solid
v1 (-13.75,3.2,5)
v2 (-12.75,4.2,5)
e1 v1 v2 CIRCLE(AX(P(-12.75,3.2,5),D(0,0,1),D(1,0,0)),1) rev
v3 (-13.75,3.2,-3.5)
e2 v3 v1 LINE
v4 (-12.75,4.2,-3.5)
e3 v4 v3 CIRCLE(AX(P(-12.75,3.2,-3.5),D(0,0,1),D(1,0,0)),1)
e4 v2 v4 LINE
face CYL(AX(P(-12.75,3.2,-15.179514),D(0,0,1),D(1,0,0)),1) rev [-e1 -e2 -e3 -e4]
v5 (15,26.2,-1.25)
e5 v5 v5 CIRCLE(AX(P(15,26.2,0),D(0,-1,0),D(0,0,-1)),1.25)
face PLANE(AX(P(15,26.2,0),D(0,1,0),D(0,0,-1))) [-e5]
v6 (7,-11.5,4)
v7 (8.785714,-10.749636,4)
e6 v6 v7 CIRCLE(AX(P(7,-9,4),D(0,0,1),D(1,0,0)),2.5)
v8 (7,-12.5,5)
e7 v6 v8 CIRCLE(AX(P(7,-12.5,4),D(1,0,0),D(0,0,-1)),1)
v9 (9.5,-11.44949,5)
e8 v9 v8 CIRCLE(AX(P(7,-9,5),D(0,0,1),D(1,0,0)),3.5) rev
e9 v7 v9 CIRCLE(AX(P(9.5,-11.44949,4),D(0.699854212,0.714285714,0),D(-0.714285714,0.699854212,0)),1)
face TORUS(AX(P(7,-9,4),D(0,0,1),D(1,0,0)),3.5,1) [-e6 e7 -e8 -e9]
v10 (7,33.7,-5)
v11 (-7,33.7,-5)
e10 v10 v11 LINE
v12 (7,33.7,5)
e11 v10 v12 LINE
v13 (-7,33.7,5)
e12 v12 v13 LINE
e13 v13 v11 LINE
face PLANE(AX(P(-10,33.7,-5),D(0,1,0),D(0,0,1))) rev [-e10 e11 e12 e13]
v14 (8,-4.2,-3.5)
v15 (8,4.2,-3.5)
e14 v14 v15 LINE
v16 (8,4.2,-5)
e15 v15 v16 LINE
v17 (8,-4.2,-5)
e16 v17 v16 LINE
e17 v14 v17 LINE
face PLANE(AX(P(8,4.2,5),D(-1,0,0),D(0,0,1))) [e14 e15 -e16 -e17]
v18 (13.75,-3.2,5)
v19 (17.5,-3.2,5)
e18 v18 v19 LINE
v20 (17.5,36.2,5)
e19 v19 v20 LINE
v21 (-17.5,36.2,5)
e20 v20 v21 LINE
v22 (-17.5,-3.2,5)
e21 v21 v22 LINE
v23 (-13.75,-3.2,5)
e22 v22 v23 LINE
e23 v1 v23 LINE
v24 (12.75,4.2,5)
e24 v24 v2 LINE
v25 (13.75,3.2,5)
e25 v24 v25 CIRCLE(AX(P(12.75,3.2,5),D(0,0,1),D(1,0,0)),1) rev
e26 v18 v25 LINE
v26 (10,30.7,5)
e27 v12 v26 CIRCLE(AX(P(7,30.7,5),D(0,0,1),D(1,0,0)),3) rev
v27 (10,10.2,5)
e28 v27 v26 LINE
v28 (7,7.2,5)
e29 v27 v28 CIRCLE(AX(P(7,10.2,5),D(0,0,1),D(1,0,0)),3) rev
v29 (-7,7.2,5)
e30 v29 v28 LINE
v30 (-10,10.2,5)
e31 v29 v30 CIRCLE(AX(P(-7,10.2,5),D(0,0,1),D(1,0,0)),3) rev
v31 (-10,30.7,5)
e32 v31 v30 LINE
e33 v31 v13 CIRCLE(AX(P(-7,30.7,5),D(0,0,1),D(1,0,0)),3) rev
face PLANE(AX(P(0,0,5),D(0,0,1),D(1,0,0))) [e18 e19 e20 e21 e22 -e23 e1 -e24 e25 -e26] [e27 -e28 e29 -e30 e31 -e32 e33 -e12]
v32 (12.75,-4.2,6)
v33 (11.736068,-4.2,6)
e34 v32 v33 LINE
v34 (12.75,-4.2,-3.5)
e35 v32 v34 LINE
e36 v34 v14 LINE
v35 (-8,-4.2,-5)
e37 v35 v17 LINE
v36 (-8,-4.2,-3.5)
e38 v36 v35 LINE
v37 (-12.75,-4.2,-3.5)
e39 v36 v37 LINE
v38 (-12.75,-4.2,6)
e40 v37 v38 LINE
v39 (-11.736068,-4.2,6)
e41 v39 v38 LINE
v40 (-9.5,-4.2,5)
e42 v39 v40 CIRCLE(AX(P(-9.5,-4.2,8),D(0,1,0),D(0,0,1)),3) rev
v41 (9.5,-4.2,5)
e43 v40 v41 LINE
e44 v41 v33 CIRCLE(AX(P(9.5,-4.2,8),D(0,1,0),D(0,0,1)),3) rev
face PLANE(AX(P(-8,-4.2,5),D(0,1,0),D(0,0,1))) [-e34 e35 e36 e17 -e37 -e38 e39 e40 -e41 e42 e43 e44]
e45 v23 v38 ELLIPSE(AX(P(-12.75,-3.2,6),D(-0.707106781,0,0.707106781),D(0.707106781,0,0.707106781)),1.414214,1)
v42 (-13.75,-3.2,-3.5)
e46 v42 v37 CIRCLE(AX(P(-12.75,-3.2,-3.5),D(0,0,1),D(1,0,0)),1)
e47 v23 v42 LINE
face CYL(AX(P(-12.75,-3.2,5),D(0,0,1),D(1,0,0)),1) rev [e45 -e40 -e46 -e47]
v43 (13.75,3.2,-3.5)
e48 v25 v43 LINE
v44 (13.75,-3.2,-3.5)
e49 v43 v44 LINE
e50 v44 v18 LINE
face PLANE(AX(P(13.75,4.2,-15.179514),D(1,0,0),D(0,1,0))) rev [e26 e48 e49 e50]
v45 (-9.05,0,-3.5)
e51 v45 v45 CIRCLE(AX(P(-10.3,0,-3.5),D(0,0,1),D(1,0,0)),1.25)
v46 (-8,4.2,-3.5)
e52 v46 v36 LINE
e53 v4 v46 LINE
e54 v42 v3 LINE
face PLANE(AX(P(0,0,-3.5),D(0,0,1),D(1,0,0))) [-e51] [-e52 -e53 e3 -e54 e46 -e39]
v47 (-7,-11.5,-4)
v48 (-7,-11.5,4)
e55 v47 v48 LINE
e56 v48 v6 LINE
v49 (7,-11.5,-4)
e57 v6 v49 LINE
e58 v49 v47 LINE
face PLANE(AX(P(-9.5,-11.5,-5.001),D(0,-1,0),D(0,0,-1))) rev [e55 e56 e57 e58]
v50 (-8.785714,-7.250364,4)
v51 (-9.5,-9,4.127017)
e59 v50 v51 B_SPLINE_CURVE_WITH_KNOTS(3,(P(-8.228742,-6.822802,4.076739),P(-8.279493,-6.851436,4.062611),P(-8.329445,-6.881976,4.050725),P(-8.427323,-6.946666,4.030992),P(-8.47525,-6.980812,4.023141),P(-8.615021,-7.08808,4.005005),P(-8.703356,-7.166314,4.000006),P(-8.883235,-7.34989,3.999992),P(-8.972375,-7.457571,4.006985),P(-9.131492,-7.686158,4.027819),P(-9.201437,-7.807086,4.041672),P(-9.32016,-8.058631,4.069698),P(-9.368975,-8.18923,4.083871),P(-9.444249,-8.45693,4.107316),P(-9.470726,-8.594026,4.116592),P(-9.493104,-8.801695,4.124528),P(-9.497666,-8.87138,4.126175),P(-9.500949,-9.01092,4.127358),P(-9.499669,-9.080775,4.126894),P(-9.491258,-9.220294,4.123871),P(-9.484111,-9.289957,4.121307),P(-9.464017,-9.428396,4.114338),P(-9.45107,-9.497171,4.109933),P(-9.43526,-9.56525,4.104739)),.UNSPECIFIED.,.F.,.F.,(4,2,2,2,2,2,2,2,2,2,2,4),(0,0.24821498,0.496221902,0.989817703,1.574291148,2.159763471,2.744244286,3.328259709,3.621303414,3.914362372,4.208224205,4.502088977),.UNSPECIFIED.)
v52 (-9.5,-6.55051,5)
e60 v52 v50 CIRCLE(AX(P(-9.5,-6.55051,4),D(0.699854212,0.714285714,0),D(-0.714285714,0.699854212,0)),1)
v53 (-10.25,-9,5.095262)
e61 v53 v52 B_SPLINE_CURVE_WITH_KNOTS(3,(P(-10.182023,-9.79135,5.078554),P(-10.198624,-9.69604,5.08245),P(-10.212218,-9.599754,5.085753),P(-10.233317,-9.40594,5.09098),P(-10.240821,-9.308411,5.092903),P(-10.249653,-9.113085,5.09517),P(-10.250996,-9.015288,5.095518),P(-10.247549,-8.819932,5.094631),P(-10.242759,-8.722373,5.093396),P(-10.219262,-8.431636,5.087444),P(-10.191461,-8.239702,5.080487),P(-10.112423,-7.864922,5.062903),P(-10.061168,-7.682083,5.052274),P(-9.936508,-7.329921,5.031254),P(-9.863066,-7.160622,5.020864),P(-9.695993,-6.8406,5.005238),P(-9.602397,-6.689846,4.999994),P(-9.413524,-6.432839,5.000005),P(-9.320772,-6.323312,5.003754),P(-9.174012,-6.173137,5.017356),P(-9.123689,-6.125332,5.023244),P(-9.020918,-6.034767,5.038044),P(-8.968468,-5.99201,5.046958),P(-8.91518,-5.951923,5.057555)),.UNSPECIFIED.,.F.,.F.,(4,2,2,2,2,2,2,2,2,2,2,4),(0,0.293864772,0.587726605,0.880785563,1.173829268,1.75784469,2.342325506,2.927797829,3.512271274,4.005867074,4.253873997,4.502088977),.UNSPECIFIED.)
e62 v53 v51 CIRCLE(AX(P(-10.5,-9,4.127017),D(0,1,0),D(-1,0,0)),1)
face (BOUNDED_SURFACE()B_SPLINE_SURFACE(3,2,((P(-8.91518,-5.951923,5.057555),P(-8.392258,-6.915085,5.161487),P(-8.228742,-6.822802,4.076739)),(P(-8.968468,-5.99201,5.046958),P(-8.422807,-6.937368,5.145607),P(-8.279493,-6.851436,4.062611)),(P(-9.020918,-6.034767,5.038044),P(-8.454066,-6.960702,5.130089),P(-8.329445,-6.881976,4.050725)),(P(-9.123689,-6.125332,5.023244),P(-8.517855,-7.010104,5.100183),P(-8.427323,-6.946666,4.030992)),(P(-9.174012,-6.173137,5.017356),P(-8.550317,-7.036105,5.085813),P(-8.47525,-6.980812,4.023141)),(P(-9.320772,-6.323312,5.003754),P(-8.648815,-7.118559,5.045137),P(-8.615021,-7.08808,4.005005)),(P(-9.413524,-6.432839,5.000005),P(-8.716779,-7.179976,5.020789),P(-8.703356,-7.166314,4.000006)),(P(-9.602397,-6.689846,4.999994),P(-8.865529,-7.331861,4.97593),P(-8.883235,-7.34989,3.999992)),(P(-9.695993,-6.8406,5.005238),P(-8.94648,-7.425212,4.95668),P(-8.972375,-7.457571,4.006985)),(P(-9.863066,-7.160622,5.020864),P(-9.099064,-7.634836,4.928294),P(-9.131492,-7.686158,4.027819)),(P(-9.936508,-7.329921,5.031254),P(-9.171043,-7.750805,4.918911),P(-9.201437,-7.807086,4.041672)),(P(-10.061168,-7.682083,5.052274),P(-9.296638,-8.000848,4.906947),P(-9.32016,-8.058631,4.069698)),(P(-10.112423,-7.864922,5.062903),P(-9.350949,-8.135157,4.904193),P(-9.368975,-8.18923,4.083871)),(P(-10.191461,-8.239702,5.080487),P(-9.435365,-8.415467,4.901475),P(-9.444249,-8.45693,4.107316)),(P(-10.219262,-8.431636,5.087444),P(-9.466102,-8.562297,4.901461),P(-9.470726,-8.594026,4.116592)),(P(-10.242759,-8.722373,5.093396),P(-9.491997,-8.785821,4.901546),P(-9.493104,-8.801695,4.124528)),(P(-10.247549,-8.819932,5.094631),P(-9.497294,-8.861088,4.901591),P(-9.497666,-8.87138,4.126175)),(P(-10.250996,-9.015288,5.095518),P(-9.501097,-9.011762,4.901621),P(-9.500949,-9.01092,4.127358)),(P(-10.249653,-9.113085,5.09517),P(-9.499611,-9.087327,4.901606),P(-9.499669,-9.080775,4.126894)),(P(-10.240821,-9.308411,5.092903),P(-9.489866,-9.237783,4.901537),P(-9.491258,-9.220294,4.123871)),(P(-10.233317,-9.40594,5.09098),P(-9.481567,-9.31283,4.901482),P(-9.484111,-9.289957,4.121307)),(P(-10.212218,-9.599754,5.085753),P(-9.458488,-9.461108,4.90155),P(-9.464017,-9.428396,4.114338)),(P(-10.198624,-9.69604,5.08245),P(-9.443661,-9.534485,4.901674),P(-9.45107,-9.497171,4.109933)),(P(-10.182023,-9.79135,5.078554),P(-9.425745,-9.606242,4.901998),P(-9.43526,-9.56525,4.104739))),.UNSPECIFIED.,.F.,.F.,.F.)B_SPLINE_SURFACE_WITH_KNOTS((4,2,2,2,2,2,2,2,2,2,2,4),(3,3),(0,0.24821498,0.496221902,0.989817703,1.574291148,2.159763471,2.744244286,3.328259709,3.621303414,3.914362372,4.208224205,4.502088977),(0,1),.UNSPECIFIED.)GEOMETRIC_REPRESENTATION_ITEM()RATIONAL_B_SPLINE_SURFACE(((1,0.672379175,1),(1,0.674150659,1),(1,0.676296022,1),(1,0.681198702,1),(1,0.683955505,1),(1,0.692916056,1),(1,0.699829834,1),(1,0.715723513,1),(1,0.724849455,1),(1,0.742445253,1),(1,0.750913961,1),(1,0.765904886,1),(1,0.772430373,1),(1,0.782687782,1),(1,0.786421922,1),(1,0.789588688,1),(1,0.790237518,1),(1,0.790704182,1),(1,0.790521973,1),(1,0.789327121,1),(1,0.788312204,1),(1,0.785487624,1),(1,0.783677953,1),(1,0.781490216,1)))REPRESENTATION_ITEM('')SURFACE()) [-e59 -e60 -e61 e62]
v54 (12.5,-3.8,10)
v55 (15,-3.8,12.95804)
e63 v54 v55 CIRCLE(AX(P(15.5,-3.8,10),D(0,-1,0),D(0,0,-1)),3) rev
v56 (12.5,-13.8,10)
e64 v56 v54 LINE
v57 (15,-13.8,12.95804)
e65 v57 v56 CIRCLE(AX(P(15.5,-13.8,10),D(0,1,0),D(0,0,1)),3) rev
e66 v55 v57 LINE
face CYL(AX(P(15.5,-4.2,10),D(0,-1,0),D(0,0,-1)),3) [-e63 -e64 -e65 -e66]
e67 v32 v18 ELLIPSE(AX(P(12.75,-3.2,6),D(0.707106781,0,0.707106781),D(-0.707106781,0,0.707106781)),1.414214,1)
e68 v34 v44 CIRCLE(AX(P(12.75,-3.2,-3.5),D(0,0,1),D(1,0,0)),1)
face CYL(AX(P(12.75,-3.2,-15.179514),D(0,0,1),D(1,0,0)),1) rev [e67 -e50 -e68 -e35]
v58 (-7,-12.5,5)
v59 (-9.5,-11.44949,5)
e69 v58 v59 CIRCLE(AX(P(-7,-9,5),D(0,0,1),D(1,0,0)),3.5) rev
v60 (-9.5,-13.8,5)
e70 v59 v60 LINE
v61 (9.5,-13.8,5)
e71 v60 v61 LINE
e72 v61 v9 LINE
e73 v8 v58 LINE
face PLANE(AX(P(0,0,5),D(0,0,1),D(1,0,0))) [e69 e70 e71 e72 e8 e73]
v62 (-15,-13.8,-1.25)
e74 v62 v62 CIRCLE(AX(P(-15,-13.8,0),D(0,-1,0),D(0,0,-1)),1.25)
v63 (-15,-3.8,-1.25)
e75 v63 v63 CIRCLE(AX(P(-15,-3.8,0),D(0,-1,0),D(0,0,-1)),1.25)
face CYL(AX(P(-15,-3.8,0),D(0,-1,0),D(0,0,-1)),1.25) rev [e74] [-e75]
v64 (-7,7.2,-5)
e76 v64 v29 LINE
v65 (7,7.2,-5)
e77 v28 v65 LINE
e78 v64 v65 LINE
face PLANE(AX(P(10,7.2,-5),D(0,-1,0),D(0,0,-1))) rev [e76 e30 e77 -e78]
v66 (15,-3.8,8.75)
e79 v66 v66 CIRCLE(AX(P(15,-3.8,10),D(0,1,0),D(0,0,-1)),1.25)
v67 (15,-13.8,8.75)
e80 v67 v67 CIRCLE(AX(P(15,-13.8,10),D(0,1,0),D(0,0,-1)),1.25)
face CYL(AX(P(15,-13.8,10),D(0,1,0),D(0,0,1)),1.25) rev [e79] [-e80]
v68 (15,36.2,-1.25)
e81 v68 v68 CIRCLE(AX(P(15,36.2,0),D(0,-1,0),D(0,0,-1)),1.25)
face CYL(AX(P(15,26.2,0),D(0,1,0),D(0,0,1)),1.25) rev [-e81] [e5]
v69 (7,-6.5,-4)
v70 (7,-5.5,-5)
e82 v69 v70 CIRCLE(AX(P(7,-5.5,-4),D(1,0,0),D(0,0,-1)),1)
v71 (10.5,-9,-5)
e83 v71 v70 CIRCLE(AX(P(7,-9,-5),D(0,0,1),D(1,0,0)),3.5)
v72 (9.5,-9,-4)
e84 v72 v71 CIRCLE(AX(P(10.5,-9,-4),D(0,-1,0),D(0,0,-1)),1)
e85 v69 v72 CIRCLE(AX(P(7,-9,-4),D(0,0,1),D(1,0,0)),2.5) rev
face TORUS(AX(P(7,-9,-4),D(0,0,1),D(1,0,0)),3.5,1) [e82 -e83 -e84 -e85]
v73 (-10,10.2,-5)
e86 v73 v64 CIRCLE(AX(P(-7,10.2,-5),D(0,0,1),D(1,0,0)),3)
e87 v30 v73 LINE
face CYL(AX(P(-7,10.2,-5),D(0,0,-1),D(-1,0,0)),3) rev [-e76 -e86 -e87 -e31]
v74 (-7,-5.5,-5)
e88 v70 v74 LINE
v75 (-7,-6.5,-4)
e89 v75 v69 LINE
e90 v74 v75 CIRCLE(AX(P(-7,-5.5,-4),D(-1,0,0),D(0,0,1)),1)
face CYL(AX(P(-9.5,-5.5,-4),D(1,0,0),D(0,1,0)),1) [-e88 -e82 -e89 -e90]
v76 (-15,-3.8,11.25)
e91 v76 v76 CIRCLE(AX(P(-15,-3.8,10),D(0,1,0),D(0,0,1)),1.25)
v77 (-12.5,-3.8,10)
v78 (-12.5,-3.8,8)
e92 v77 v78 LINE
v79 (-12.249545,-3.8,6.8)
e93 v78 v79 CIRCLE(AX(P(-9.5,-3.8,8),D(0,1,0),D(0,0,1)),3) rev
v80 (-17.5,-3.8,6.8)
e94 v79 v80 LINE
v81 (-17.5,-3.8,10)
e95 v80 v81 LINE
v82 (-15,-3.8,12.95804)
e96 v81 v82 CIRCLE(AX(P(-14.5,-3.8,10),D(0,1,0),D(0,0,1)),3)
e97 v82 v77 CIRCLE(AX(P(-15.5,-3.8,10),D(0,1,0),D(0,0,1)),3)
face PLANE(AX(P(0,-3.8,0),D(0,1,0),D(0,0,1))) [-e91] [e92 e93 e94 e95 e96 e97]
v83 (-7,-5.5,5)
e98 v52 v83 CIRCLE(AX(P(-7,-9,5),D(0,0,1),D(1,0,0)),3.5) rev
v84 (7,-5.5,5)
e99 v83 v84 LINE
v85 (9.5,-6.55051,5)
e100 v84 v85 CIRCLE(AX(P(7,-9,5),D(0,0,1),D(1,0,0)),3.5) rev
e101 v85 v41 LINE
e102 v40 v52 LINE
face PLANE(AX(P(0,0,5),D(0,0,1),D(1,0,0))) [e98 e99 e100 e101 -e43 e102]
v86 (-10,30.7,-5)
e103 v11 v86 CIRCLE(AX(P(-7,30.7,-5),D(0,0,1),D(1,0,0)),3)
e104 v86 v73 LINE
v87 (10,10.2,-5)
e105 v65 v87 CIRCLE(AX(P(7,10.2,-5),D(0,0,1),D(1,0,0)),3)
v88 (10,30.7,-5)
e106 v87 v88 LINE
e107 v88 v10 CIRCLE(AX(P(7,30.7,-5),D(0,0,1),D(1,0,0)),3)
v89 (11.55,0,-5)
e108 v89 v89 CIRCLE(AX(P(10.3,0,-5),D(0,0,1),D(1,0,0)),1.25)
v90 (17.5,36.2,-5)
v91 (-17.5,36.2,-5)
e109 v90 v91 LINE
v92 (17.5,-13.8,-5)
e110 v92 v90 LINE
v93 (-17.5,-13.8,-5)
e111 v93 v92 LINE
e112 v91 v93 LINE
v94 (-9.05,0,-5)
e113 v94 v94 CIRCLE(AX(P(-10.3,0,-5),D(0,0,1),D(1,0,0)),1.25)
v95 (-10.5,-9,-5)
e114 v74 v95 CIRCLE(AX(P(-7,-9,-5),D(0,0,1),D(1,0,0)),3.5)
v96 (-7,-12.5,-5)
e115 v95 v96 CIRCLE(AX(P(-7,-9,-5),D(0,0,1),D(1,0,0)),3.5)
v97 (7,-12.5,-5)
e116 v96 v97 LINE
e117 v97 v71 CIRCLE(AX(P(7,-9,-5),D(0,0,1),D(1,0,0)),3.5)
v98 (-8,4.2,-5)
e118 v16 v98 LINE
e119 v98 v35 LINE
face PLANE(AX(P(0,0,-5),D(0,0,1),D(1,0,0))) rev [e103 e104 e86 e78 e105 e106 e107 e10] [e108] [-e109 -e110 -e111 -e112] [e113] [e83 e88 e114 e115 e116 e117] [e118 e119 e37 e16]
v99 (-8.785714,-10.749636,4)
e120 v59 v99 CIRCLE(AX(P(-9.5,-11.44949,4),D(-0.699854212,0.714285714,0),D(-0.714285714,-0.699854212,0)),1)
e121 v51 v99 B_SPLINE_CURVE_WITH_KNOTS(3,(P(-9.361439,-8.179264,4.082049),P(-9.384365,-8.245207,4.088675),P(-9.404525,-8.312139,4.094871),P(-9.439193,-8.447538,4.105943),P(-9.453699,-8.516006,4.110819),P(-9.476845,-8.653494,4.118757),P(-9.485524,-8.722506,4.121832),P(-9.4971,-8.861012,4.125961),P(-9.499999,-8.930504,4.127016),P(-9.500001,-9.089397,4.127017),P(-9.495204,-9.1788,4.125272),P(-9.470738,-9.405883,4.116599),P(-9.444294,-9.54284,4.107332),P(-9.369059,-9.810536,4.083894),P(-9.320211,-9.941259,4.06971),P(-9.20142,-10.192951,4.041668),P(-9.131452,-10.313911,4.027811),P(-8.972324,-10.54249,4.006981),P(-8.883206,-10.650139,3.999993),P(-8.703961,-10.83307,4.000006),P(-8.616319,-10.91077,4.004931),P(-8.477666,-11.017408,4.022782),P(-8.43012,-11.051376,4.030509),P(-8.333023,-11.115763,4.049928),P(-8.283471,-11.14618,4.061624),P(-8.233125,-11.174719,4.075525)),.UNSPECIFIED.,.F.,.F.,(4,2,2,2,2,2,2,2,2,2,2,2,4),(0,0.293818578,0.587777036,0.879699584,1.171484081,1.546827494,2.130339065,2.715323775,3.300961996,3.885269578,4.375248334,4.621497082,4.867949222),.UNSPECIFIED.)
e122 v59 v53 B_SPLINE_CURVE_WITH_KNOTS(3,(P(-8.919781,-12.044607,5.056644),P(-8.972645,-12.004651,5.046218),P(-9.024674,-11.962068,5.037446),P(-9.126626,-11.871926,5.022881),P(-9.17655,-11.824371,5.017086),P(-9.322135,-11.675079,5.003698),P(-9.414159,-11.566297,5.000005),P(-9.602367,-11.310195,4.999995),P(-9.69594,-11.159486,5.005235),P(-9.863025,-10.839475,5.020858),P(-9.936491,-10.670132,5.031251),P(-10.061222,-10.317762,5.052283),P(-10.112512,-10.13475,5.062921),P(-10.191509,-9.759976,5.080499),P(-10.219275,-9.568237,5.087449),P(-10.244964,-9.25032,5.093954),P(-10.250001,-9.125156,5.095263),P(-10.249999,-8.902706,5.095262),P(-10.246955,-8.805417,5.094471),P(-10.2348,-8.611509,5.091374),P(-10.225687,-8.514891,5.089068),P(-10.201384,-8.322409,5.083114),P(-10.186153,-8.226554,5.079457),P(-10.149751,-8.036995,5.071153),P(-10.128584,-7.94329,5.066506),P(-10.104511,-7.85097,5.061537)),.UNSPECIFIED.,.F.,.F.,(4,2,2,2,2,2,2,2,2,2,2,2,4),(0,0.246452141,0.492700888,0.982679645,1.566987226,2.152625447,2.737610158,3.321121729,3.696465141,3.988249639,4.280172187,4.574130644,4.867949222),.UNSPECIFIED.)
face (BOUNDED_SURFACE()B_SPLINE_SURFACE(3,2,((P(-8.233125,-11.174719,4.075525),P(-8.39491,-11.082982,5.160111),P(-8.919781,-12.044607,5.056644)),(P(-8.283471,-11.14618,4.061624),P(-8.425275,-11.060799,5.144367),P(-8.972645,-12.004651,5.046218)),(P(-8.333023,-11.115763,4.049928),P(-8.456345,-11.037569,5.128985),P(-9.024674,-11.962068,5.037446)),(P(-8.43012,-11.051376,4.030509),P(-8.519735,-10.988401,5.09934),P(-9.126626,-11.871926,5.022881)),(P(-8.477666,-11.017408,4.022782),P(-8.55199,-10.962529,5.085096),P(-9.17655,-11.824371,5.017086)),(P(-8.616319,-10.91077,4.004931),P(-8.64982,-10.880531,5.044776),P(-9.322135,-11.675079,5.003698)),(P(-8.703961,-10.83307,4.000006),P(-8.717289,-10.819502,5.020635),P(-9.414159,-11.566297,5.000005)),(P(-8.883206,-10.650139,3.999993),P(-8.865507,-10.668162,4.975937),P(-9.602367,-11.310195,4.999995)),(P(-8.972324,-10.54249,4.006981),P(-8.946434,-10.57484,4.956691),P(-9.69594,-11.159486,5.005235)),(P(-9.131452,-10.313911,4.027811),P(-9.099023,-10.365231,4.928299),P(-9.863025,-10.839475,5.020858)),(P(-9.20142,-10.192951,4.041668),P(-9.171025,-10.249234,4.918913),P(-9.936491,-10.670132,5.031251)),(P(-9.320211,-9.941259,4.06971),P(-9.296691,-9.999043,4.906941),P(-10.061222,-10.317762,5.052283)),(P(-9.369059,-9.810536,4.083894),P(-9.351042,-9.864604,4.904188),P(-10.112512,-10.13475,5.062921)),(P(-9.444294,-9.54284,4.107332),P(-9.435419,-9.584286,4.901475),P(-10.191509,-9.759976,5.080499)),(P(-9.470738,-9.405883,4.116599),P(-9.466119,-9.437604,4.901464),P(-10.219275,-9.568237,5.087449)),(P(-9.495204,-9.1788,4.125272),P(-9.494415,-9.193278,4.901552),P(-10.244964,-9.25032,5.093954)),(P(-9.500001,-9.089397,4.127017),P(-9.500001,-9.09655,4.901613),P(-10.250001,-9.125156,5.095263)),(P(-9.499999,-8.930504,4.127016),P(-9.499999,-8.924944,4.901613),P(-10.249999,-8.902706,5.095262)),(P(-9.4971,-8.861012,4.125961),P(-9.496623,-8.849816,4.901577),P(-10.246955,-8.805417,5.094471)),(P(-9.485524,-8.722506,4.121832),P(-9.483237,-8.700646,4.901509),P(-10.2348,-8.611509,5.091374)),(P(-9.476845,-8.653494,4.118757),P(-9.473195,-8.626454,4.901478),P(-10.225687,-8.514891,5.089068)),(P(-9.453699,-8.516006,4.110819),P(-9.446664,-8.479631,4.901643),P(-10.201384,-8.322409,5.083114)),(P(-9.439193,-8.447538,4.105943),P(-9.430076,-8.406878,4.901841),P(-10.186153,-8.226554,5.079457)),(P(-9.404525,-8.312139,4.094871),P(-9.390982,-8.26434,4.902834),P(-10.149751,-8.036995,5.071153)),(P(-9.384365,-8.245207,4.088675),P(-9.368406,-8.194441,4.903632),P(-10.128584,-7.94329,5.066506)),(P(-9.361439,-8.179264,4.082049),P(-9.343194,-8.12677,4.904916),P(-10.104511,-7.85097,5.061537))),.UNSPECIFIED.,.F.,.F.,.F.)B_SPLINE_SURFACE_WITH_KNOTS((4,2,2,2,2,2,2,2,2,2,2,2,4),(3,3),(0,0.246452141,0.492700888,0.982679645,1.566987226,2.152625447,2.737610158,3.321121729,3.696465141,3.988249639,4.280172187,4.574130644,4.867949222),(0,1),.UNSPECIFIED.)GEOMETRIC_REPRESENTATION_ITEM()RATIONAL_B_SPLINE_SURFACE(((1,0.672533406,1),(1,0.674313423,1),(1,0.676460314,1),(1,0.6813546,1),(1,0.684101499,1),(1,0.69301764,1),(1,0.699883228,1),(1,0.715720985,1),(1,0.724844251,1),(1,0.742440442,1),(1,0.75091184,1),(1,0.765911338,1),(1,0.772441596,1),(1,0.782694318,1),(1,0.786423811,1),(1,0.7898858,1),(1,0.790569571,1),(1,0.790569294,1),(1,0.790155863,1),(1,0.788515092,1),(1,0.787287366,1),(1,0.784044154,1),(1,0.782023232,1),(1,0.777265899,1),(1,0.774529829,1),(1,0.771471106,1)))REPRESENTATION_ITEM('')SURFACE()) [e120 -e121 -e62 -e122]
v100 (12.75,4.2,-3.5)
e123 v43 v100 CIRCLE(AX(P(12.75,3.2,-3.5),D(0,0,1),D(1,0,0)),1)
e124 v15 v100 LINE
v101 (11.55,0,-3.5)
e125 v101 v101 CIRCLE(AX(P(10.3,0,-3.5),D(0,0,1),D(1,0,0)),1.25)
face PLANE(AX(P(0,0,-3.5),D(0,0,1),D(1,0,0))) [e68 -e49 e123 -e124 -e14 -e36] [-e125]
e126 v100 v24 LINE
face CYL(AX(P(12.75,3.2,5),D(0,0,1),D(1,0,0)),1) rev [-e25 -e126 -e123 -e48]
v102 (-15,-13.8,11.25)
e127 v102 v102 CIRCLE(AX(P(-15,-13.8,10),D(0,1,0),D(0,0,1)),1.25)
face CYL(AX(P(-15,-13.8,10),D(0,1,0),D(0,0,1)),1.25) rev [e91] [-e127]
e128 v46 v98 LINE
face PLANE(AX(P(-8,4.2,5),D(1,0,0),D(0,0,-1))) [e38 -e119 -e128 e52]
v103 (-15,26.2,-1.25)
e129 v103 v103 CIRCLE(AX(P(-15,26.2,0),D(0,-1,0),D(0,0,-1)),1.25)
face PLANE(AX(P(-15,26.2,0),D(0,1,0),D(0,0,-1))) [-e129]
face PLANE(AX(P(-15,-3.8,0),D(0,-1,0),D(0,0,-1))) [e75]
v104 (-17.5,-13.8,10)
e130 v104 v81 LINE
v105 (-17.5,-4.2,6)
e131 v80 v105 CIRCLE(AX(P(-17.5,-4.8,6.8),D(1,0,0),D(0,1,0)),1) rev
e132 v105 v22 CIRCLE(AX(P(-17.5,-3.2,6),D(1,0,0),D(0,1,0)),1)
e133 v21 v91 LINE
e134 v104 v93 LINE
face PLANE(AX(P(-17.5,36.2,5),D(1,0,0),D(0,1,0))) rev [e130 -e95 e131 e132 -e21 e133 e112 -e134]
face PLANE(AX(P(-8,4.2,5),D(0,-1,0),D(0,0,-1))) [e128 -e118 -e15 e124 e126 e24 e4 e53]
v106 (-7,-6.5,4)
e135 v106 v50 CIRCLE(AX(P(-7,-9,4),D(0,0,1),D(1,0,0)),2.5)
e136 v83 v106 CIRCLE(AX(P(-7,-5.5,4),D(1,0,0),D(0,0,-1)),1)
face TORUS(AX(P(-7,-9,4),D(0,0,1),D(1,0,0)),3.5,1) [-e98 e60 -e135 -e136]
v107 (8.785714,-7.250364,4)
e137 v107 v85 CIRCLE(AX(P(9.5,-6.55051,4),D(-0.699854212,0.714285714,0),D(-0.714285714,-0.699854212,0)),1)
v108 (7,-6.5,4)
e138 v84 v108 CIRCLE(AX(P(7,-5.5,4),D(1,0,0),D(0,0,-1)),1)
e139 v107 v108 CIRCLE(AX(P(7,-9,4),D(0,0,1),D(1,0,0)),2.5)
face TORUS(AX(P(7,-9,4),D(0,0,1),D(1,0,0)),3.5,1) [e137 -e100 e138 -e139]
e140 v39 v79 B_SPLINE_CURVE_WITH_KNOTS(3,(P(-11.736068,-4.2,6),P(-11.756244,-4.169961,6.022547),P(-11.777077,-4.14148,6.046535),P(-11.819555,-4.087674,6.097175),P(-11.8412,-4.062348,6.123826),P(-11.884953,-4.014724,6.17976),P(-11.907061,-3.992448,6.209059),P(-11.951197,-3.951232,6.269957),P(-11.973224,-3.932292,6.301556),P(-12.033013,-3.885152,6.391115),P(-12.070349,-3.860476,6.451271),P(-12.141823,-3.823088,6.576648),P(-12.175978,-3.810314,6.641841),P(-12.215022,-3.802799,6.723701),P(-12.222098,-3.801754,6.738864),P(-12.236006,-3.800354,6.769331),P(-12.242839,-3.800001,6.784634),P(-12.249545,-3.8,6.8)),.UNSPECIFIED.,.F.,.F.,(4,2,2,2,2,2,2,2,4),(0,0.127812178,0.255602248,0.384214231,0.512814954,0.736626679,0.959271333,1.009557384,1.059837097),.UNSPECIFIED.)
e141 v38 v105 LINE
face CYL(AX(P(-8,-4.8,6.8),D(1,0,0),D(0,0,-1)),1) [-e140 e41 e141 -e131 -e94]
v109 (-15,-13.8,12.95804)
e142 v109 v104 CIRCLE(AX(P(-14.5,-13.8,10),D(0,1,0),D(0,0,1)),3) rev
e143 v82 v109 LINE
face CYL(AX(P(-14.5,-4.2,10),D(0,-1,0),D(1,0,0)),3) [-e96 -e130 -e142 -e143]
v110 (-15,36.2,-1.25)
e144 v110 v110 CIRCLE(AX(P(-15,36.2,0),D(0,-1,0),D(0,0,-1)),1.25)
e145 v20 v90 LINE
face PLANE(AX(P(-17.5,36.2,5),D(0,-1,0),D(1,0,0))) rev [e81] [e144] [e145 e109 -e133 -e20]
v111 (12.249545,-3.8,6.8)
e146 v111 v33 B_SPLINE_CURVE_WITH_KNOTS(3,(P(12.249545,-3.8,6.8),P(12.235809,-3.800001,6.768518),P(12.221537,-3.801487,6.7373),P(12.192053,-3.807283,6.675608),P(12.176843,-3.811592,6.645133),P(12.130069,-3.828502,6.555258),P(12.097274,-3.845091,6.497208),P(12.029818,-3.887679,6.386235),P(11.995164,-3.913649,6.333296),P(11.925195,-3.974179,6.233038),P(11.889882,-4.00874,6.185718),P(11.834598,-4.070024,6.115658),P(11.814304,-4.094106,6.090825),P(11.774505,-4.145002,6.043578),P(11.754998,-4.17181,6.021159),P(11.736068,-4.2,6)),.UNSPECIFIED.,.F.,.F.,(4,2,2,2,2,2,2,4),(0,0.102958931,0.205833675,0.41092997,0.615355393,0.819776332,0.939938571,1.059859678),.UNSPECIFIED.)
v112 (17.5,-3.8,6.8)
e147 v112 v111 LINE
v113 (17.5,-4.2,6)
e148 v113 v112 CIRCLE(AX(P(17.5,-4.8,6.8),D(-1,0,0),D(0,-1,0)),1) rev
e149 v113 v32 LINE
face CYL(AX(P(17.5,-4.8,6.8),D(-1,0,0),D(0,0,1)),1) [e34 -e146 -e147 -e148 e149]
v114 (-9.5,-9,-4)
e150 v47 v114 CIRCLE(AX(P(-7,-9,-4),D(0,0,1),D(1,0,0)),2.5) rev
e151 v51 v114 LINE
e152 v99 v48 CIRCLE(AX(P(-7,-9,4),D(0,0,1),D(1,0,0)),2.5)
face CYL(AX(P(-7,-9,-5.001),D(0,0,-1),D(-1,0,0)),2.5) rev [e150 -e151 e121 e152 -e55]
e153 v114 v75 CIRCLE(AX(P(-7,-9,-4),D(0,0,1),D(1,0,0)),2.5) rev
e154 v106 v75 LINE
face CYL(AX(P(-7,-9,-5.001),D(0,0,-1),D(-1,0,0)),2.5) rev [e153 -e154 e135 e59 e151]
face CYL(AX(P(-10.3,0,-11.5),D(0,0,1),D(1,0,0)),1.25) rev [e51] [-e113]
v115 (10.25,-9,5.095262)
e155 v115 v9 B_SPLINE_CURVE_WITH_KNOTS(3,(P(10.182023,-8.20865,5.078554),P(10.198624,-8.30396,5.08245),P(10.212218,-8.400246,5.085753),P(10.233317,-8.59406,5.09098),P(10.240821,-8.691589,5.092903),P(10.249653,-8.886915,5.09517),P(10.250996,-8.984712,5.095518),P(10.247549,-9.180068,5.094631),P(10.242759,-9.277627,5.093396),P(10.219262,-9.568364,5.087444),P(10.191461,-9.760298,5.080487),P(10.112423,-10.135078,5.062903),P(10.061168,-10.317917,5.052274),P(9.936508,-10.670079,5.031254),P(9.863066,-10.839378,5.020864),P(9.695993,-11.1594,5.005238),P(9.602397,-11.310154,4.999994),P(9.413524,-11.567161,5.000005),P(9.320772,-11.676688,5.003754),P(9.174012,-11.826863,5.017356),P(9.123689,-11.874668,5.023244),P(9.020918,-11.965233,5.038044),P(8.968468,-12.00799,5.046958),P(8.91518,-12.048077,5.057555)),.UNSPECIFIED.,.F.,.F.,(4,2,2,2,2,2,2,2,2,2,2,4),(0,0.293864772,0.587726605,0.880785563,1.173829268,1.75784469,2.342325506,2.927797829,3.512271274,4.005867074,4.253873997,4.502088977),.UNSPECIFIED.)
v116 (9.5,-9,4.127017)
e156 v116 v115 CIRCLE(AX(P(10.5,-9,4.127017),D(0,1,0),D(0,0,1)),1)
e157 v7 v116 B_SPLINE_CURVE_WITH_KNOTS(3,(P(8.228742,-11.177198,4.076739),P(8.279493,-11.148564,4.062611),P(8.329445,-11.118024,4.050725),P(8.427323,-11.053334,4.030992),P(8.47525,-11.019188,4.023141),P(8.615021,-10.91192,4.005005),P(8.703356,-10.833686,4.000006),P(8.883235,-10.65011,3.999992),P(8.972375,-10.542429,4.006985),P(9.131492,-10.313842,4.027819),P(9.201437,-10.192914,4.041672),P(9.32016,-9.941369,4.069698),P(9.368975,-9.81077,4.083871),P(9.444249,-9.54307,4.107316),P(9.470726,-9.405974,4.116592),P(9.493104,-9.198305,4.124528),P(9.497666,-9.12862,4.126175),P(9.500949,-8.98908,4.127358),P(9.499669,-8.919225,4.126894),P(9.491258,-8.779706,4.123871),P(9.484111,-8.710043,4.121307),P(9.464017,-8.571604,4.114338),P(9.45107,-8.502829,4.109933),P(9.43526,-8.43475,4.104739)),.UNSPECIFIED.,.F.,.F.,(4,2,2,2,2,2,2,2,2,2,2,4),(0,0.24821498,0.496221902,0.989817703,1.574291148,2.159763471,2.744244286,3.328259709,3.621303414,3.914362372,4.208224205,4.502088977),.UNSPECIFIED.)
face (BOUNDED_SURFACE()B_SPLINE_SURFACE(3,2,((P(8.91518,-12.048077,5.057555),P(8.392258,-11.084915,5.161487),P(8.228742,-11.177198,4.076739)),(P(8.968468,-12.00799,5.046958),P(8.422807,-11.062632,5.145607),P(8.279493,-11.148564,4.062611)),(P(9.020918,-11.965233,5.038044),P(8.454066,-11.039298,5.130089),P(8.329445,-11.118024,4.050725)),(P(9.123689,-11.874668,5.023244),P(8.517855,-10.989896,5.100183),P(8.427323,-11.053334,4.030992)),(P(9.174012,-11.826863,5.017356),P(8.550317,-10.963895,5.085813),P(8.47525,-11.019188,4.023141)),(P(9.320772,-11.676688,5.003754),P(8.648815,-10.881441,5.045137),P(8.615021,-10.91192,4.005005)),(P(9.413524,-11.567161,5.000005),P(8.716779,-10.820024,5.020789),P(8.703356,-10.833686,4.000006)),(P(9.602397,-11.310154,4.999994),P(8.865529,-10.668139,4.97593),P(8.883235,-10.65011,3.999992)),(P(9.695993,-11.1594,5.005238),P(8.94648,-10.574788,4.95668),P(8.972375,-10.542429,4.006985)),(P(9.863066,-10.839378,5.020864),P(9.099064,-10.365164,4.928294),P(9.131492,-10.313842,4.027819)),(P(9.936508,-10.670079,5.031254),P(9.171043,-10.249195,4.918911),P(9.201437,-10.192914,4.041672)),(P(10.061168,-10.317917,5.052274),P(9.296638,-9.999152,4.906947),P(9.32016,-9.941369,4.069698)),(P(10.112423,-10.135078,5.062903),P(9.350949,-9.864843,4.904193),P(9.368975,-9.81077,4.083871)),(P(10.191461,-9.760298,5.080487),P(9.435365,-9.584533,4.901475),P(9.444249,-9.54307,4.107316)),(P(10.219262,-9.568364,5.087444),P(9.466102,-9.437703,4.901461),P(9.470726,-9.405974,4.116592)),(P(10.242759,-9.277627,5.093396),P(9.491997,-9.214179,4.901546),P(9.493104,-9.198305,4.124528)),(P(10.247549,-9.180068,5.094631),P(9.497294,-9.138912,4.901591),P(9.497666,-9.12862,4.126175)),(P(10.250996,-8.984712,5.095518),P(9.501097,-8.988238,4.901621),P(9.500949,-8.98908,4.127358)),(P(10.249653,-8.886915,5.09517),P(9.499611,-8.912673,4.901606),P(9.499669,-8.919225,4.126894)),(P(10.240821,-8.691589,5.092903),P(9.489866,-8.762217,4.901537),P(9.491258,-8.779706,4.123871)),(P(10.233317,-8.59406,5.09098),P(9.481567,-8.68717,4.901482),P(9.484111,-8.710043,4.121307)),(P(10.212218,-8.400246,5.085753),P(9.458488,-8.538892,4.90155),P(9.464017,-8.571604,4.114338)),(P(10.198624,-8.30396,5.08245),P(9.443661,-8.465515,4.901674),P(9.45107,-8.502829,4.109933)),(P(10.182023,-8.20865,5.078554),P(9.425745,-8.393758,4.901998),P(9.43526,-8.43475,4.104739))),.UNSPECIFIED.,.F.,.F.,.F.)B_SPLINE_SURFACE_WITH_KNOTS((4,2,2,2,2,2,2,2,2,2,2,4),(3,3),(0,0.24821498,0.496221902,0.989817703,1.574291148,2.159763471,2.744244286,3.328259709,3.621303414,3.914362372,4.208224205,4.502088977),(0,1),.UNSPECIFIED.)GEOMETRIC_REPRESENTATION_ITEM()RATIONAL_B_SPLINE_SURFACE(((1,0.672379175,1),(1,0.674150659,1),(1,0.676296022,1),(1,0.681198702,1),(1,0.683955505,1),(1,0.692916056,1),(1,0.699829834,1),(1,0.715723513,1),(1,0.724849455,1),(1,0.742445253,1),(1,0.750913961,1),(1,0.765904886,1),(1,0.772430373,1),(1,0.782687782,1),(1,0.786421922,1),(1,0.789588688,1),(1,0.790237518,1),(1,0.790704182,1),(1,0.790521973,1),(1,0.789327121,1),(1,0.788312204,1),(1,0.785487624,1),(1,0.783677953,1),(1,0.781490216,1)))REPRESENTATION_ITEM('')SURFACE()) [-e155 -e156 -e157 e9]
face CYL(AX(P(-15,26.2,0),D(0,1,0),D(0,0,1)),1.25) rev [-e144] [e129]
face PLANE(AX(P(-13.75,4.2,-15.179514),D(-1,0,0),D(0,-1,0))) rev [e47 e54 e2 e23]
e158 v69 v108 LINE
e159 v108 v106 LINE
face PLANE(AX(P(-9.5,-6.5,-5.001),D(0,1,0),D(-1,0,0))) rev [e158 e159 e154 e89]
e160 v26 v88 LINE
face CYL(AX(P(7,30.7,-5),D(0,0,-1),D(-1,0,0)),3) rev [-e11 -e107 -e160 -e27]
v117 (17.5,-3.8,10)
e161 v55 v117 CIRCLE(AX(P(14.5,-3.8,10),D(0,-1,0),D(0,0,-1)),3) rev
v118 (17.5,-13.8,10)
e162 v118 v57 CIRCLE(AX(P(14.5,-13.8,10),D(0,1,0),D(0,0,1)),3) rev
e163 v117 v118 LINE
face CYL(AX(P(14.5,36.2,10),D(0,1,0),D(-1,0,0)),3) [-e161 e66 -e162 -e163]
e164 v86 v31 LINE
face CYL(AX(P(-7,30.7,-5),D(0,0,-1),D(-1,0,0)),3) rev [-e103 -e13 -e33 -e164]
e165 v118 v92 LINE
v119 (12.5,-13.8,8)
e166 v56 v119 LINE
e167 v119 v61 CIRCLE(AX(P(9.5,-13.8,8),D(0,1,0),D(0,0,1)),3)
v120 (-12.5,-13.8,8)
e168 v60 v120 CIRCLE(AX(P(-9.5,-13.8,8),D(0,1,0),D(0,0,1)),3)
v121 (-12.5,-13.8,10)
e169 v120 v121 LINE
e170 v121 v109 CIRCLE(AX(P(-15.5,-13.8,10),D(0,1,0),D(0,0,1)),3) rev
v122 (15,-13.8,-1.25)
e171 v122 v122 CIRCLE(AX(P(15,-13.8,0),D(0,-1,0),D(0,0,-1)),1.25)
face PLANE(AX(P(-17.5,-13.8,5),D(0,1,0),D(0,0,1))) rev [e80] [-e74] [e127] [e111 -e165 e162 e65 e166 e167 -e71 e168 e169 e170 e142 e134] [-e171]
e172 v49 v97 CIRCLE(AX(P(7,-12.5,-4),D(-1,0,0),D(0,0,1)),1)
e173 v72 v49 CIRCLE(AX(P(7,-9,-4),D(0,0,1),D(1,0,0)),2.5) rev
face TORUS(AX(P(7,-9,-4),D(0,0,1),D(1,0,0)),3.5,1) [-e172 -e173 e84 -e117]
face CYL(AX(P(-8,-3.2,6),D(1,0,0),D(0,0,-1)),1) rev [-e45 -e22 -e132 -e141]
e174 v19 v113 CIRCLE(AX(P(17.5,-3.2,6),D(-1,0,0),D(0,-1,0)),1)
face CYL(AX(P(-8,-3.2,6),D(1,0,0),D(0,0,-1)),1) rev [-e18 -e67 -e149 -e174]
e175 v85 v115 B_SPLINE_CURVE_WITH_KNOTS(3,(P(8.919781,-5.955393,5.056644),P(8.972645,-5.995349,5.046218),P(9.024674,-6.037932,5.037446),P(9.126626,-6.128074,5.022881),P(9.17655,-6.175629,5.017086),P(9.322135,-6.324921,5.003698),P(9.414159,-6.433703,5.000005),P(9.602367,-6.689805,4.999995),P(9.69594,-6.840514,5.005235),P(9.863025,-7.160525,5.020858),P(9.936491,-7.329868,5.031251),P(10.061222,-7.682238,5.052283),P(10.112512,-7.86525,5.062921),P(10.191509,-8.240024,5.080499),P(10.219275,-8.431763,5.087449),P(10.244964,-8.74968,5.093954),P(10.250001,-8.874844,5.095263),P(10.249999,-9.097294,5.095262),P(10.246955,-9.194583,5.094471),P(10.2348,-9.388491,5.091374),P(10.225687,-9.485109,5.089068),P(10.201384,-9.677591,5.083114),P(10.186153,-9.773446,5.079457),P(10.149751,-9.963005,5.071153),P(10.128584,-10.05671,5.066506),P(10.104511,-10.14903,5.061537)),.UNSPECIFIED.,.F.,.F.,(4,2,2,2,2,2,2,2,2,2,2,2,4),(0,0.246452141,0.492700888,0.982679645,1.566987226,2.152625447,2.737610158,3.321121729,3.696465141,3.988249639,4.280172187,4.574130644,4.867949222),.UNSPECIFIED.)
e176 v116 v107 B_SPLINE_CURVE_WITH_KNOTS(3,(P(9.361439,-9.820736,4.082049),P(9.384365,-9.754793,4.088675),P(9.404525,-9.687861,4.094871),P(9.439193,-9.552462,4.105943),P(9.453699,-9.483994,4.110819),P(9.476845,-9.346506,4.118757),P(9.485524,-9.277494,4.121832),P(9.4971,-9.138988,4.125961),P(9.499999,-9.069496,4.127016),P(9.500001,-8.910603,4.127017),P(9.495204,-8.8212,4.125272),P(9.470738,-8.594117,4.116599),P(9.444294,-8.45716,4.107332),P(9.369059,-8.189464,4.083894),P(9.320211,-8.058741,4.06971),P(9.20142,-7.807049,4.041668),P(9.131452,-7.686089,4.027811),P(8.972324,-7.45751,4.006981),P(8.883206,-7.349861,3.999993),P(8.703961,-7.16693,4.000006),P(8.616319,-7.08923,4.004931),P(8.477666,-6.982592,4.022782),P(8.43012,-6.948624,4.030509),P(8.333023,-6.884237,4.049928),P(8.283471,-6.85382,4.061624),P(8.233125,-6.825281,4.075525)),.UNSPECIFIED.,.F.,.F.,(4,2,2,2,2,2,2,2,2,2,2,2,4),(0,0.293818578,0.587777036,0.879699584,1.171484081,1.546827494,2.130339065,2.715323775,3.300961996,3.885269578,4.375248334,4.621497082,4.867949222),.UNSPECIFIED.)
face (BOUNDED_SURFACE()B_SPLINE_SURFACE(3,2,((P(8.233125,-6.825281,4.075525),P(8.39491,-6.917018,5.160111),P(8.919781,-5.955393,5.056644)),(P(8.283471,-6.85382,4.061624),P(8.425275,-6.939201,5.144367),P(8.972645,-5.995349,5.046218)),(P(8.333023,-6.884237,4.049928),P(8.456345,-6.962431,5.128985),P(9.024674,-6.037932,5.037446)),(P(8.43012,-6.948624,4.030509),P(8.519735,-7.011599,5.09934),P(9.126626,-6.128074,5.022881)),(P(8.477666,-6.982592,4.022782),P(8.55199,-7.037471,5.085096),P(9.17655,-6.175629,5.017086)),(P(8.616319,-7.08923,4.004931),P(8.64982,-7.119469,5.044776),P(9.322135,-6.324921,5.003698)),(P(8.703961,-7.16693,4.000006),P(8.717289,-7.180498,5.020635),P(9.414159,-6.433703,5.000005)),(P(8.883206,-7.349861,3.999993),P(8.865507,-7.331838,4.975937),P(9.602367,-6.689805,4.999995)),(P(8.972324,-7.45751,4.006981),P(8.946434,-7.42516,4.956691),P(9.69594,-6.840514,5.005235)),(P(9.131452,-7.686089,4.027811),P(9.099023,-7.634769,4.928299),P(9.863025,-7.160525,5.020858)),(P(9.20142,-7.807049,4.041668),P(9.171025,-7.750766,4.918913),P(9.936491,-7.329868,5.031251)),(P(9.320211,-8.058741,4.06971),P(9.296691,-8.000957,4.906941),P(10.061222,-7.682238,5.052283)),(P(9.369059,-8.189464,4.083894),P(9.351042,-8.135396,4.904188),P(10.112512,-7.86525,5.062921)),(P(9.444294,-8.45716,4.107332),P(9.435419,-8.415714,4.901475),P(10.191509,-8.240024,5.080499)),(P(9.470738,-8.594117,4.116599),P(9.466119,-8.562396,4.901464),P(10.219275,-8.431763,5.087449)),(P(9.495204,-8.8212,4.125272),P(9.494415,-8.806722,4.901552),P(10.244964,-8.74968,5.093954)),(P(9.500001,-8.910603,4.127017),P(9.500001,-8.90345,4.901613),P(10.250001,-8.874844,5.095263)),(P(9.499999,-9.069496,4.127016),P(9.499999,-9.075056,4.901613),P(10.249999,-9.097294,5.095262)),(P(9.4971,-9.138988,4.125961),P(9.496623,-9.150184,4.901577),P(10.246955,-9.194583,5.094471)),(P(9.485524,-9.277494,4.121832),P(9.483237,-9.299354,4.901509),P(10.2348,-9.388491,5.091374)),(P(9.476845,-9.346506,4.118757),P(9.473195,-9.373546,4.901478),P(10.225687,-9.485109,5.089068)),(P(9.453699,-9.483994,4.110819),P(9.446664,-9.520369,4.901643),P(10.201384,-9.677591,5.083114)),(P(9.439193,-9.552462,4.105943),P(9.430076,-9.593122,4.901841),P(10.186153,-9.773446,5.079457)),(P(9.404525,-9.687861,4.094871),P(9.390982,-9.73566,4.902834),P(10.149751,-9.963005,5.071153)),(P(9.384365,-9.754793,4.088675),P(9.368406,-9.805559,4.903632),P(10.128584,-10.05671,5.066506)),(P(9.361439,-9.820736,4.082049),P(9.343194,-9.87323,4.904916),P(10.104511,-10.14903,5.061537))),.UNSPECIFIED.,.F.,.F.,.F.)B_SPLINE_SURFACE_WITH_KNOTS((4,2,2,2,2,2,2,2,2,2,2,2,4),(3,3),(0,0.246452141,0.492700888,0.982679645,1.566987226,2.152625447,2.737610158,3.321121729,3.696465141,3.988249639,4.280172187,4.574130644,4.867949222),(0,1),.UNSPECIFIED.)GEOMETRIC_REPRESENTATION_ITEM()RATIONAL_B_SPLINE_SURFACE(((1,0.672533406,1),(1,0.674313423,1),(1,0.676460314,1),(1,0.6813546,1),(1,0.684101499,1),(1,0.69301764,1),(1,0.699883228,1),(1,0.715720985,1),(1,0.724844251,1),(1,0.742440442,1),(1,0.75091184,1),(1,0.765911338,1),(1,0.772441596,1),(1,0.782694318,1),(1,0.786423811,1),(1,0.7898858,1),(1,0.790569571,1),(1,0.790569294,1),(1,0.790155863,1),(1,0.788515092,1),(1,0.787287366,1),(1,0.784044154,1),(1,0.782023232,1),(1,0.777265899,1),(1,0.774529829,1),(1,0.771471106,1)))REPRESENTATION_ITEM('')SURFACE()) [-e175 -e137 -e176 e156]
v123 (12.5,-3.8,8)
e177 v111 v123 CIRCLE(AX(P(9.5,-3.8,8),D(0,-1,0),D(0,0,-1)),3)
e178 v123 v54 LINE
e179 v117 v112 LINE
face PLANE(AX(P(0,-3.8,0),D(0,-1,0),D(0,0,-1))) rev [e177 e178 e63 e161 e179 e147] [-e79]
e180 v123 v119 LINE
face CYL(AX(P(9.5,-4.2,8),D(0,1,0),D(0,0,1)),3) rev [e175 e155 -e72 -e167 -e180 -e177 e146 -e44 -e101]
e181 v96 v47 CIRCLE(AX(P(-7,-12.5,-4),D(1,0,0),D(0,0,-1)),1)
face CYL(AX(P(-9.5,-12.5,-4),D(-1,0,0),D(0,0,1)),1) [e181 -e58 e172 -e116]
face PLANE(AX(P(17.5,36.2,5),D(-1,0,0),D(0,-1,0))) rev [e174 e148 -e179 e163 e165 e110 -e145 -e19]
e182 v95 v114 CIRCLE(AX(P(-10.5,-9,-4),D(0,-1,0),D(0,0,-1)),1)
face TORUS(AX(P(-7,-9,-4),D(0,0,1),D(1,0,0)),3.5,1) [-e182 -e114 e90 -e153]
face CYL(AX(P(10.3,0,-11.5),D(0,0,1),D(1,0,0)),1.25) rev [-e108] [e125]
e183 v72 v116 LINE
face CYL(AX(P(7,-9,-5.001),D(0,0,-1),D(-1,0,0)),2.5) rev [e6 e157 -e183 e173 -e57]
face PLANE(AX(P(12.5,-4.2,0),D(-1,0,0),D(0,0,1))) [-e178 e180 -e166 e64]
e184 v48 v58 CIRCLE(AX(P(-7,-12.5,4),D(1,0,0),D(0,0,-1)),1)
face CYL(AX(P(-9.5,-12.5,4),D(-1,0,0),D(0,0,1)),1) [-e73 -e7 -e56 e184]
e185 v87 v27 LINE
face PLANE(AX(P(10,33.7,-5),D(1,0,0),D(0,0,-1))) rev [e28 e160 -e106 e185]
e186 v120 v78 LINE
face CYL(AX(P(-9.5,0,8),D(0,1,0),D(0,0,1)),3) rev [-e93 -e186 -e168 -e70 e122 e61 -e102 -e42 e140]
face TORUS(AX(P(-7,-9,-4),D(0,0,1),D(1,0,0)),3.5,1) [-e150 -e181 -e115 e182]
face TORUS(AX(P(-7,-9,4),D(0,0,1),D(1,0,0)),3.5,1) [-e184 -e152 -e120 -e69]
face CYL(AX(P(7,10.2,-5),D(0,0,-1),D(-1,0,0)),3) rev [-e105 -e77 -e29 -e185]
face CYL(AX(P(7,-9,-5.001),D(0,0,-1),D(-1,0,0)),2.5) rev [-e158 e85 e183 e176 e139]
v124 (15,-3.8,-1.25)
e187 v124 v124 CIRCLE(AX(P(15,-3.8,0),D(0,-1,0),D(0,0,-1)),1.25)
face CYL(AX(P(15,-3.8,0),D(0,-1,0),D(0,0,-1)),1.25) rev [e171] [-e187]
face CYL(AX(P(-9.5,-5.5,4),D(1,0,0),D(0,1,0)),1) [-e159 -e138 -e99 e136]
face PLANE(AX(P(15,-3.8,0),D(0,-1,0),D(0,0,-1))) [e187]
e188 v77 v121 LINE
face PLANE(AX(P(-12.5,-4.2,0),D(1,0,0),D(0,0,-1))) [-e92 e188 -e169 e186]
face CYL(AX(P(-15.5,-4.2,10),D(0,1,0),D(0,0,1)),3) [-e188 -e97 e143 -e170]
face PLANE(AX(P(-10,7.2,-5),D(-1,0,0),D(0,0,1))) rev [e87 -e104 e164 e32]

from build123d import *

# Parameters (mm, degrees)
SKETCH_1_W             = 35
SKETCH_1_H             = 50
SKETCH_1_W_2           = 16
SKETCH_1_H_2           = 8.4
EXTRUDE_564_DEPTH      = 5
SKETCH_2_W             = 5.75
SKETCH_2_H             = 8.4
CUT_EXTRUDE_879_DEPTH  = 8.5
FILLET_1_R             = 1
SKETCH_3_R             = 1.25
CUT_EXTRUDE_1403_DEPTH = 8
SKETCH_10_R            = 1.25
CUT_EXTRUDE_1593_DEPTH = 10
SKETCH_11_W            = 20
SKETCH_11_H            = 26.5
CUT_EXTRUDE_1977_DEPTH = 42.432957896
FILLET_2_R             = 3
SKETCH_13_W            = 5
SKETCH_13_H            = 8
EXTRUDE_4716_DEPTH     = 9.6
SKETCH_16_W            = 5
SKETCH_16_H            = 7
EXTRUDE_5207_DEPTH     = 0.4
SKETCH_14_R            = 1.25
CUT_EXTRUDE_5724_DEPTH = 46.55491192
FILLET_3_R             = 3
FILLET_4_R             = 1
FILLET_5_R             = 1
CUT_EXTRUDE_6952_REACH = 43.433
SKETCH_17_W            = 19
SKETCH_17_H            = 5
FILLET_6_R             = 2.5
FILLET_7_R             = 1


# Some blends are built 0.0001 mm under size
with BuildPart() as part:
    # Эскиз1 → Extrude 564 (new, symmetric)
    with BuildSketch(Plane.XY):
        with Locations((0, 11.2)):
            Rectangle(SKETCH_1_W, SKETCH_1_H)
        Rectangle(SKETCH_1_W_2, SKETCH_1_H_2, mode=Mode.SUBTRACT)
    extrude(amount=EXTRUDE_564_DEPTH, both=True)

    # Эскиз2 → Cut-Extrude 879 (cut)
    with BuildSketch(Plane.XY.offset(5)):
        with Locations((-10.875, 0)):
            Rectangle(SKETCH_2_W, SKETCH_2_H)
        with Locations((10.875, 0)):
            Rectangle(SKETCH_2_W, SKETCH_2_H)
    extrude(amount=-CUT_EXTRUDE_879_DEPTH, mode=Mode.SUBTRACT)

    # Скругление1
    fillet_1_edges = [part.edges().sort_by_distance(p)[0] for p in [
        (-13.75, -4.2, 0.75),
        (-13.75, 4.2, 0.75),
        (13.75, 4.2, 0.75),
        (13.75, -4.2, 0.75),
    ]]
    fillet(fillet_1_edges, radius=FILLET_1_R)

    # Эскиз3 → Cut-Extrude 1403 (cut)
    with BuildSketch(Plane.XY.offset(-3.5)):
        with Locations((-10.3, 0)):
            Circle(SKETCH_3_R)
        with Locations((10.3, 0)):
            Circle(SKETCH_3_R)
    extrude(amount=-CUT_EXTRUDE_1403_DEPTH, mode=Mode.SUBTRACT)

    # Эскиз10 → Cut-Extrude 1593 (cut)
    with BuildSketch(Plane.XZ.offset(13.8)):
        with Locations(Location((-15, 0, 0), (0, 0, 270))):
            Circle(SKETCH_10_R)
        with Locations(Location((15, 0, 0), (0, 0, 270))):
            Circle(SKETCH_10_R)
    cut_extrude_1593 = extrude(amount=-CUT_EXTRUDE_1593_DEPTH, mode=Mode.SUBTRACT)

    # Mirror 1655: Cut-Extrude 1593 across plane
    add(cut_extrude_1593.mirror(Plane.ZX.offset(11.2)), mode=Mode.SUBTRACT)

    # Эскиз11 → Cut-Extrude 1977 (cut, through all)
    with BuildSketch(Plane.XY.offset(5)):
        with Locations((0, 20.45)):
            Rectangle(SKETCH_11_W, SKETCH_11_H)
    extrude(amount=-CUT_EXTRUDE_1977_DEPTH, mode=Mode.SUBTRACT)

    # Скругление2
    fillet_2_edges = [part.edges().sort_by_distance(p)[0] for p in [
        (10, 7.2, 0),
        (-10, 7.2, 0),
        (-10, 33.7, 0),
        (10, 33.7, 0),
    ]]
    fillet(fillet_2_edges, radius=FILLET_2_R)

    # Эскиз13 → Extrude 4716 (add)
    with BuildSketch(Plane.XZ.offset(13.8)):
        with Locations((-15, 9)):
            Rectangle(SKETCH_13_W, SKETCH_13_H)
        with Locations((15, 9)):
            Rectangle(SKETCH_13_W, SKETCH_13_H)
    extrude(amount=-EXTRUDE_4716_DEPTH)

    # Эскиз16 → Extrude 5207 (add)
    with BuildSketch(Plane(origin=(0, -4.2, 0), x_dir=(1, 0, 0), z_dir=(0, 1, 0))):
        with Locations((-15, -9.5)):
            Rectangle(SKETCH_16_W, SKETCH_16_H)
        with Locations((15, -9.5)):
            Rectangle(SKETCH_16_W, SKETCH_16_H)
    extrude(amount=EXTRUDE_5207_DEPTH)

    # Эскиз14 → Cut-Extrude 5724 (cut, through all)
    with BuildSketch(Plane(origin=(0, -3.8, 0), x_dir=(1, 0, 0), z_dir=(0, 1, 0))):
        with Locations(Location((-15, -10, 0), (0, 0, 270))):
            Circle(SKETCH_14_R)
        with Locations(Location((15, -10, 0), (0, 0, 90))):
            Circle(SKETCH_14_R)
    extrude(amount=-CUT_EXTRUDE_5724_DEPTH, mode=Mode.SUBTRACT)

    # Скругление3
    # the kernel refuses this fillet: 3 mm, written as the material it adds along each edge
    with BuildSketch(Plane(origin=(12.5, -13.8, 5), x_dir=(-1, 0, 0), z_dir=(0, 1, 0))) as fillet_3_piece_1_section:
        with BuildLine():
            CenterArc((FILLET_3_R, FILLET_3_R), FILLET_3_R, 180, 90)
            Line((0, FILLET_3_R), (0, 0))
            Line((0, 0), (FILLET_3_R, 0))
        make_face()
    fillet_3_piece_1 = extrude(amount=9.6, mode=Mode.PRIVATE)
    fillet_3_piece_1 = split(fillet_3_piece_1, bisect_by=Plane(origin=(11.641402177, -9, 6), z_dir=(0, 0, -1)), keep=Keep.TOP, mode=Mode.PRIVATE)
    add(fillet_3_piece_1)
    with BuildSketch(Plane(origin=(12.5, -13.8, 5), x_dir=(-1, 0, 0), z_dir=(0, 1, 0))) as fillet_3_piece_2_section:
        with BuildLine():
            CenterArc((FILLET_3_R, FILLET_3_R), FILLET_3_R, 180, 90)
            Line((0, FILLET_3_R), (0, 0))
            Line((0, 0), (FILLET_3_R, 0))
        make_face()
    fillet_3_piece_2 = extrude(amount=9.6, mode=Mode.PRIVATE)
    fillet_3_piece_2 = split(fillet_3_piece_2, bisect_by=Plane(origin=(12.327479681, -9, 6), z_dir=(0, 0, 1)), keep=Keep.TOP, mode=Mode.PRIVATE)
    add(fillet_3_piece_2)
    with BuildSketch(Plane(origin=(12.5, -13.8, 5), x_dir=(-1, 0, 0), z_dir=(0, 1, 0))) as fillet_3_piece_3_section:
        with BuildLine():
            CenterArc((FILLET_3_R, FILLET_3_R), FILLET_3_R, 180, 90)
            Line((0, FILLET_3_R), (0, 0))
            Line((0, 0), (FILLET_3_R, 0))
        make_face()
    fillet_3_piece_3 = extrude(amount=17.1, mode=Mode.PRIVATE)
    fillet_3_piece_3 = split(fillet_3_piece_3, bisect_by=Plane(origin=(12.327479681, -4.2, 6.589070595), z_dir=(0, 1, 0)), keep=Keep.TOP, mode=Mode.PRIVATE)
    fillet_3_piece_3 = split(fillet_3_piece_3, bisect_by=Plane(origin=(12.327479681, -3.8, 6.589070595), z_dir=(0, -1, 0)), keep=Keep.TOP, mode=Mode.PRIVATE)
    fillet_3_piece_3 = split(fillet_3_piece_3, bisect_by=Plane(origin=(12.327479681, -4, 6), z_dir=(0, 0, 1)), keep=Keep.TOP, mode=Mode.PRIVATE)
    add(fillet_3_piece_3)
    with BuildSketch(Plane(origin=(-12.5, -13.8, 5), x_dir=(0, 0, 1), z_dir=(0, 1, 0))) as fillet_3_piece_4_section:
        with BuildLine():
            CenterArc((FILLET_3_R, FILLET_3_R), FILLET_3_R, 180, 90)
            Line((0, FILLET_3_R), (0, 0))
            Line((0, 0), (FILLET_3_R, 0))
        make_face()
    fillet_3_piece_4 = extrude(amount=9.6, mode=Mode.PRIVATE)
    fillet_3_piece_4 = split(fillet_3_piece_4, bisect_by=Plane(origin=(-12.327479681, -9, 6), z_dir=(0, 0, 1)), keep=Keep.TOP, mode=Mode.PRIVATE)
    add(fillet_3_piece_4)
    with BuildSketch(Plane(origin=(-12.5, -13.8, 5), x_dir=(0, 0, 1), z_dir=(0, 1, 0))) as fillet_3_piece_5_section:
        with BuildLine():
            CenterArc((FILLET_3_R, FILLET_3_R), FILLET_3_R, 180, 90)
            Line((0, FILLET_3_R), (0, 0))
            Line((0, 0), (FILLET_3_R, 0))
        make_face()
    fillet_3_piece_5 = extrude(amount=9.6, mode=Mode.PRIVATE)
    fillet_3_piece_5 = split(fillet_3_piece_5, bisect_by=Plane(origin=(-11.641402177, -9, 6), z_dir=(0, 0, -1)), keep=Keep.TOP, mode=Mode.PRIVATE)
    add(fillet_3_piece_5)
    with BuildSketch(Plane(origin=(-12.5, -13.8, 5), x_dir=(0, 0, 1), z_dir=(0, 1, 0))) as fillet_3_piece_6_section:
        with BuildLine():
            CenterArc((FILLET_3_R, FILLET_3_R), FILLET_3_R, 180, 90)
            Line((0, FILLET_3_R), (0, 0))
            Line((0, 0), (FILLET_3_R, 0))
        make_face()
    fillet_3_piece_6 = extrude(amount=17.1, mode=Mode.PRIVATE)
    fillet_3_piece_6 = split(fillet_3_piece_6, bisect_by=Plane(origin=(-12.327479681, -4.2, 6.589070595), z_dir=(0, 1, 0)), keep=Keep.TOP, mode=Mode.PRIVATE)
    fillet_3_piece_6 = split(fillet_3_piece_6, bisect_by=Plane(origin=(-12.327479681, -4, 6), z_dir=(0, 0, 1)), keep=Keep.TOP, mode=Mode.PRIVATE)
    fillet_3_piece_6 = split(fillet_3_piece_6, bisect_by=Plane(origin=(-12.327479681, -3.8, 6.589070595), z_dir=(0, -1, 0)), keep=Keep.TOP, mode=Mode.PRIVATE)
    add(fillet_3_piece_6)
    # the kernel refuses this fillet: 3 mm, written as the material it takes off along each edge
    with BuildSketch(Plane(origin=(17.5, 3.7, 13), x_dir=(-1, 0, 0), z_dir=(0, -1, 0)), Plane(origin=(12.5, -21.3, 13), x_dir=(1, 0, 0), z_dir=(0, 1, 0)), Plane(origin=(-17.5, -21.3, 13), x_dir=(1, 0, 0), z_dir=(0, 1, 0)), Plane(origin=(-12.5, -21.3, 13), x_dir=(0, 0, -1), z_dir=(0, 1, 0))) as fillet_3_2_piece_1:
        with BuildLine():
            CenterArc((FILLET_3_R, FILLET_3_R), FILLET_3_R, 180, 90)
            Line((0, FILLET_3_R), (0, 0))
            Line((0, 0), (FILLET_3_R, 0))
        make_face()
    extrude(amount=25, mode=Mode.SUBTRACT)

    # Скругление4
    fillet_4_edges = [part.edges().sort_by_distance(p)[0] for p in [
        (15.125, -4.2, 5),
        (-15.125, -4.2, 5),
    ]]
    fillet(fillet_4_edges, radius=FILLET_4_R - 0.0001)  # a hair under: the kernel refuses the full size

    # Скругление5
    # the kernel refuses this fillet: 1 mm, written as the material it takes off along each edge
    with BuildSketch(Plane(origin=(9.736067977, -3.8, 6), x_dir=(0, 0, 1), z_dir=(1, 0, 0))) as fillet_5_piece_1:
        with BuildLine():
            CenterArc((0.8, 1), FILLET_5_R, 216.869897646, 53.130102354)
            Line((0, 0.4), (-0.016, 0.388))
            ThreePointArc((-0.016, 0.388), (-0.02, 0.2), (-0.02, 0))
            Line((-0.02, 0), (0, -0.02))
            Line((0, -0.02), (0.8, -0.02))
            Line((0.8, -0.02), (0.8, 0))
        make_face()
    extrude(amount=9.763932023, mode=Mode.SUBTRACT)
    with BuildSketch(Plane(origin=(-9.736067977, -3.8, 6), x_dir=(0, -1, 0), z_dir=(-1, 0, 0))) as fillet_5_piece_2:
        with BuildLine():
            CenterArc((1, 0.8), FILLET_5_R, 180, 53.130102354)
            Line((0, 0.8), (-0.02, 0.8))
            Line((-0.02, 0.8), (-0.02, 0))
            Line((-0.02, 0), (0, -0.02))
            ThreePointArc((0, -0.02), (0.2, -0.02), (0.388, -0.016))
            Line((0.388, -0.016), (0.4, 0))
        make_face()
    extrude(amount=9.763932023, mode=Mode.SUBTRACT)

    # Эскиз17 → Cut-Extrude 6952 (cut, up to next)
    with BuildSketch(Plane.XY.offset(5), mode=Mode.PRIVATE) as cut_extrude_6952_sk1:
        with Locations((0, -9)):
            Rectangle(SKETCH_17_W, SKETCH_17_H)
    cut_extrude_6952_tool1 = extrude(cut_extrude_6952_sk1.sketch, amount=-CUT_EXTRUDE_6952_REACH, mode=Mode.PRIVATE) & part.part
    add(cut_extrude_6952_tool1.solids().sort_by_distance((0, -9, 5))[0], mode=Mode.SUBTRACT)

    # Скругление6
    fillet_6_edges = [part.edges().sort_by_distance(p)[0] for p in [
        (9.5, -6.5, 0),
        (9.5, -11.5, 0),
        (-9.5, -6.5, 0),
        (-9.5, -11.5, 0),
    ]]
    fillet(fillet_6_edges, radius=FILLET_6_R - 0.0001)  # a hair under: the kernel refuses the full size

    # Скругление7
    fillet_7_edges = [part.edges().sort_by_distance(p)[0] for p in [
        (0, -6.5, -5),
        (0, -6.5, 5),
        (0, -11.5, -5),
        (0, -11.5, 5),
        (8.767796242, -7.232203758, 5),
        (8.767796242, -7.232203758, -5),
        (8.767796242, -10.767796242, 5),
        (8.767796242, -10.767796242, -5),
        (-8.767796242, -7.232203758, 5),
        (-8.767796242, -7.232203758, -5),
        (-8.767796242, -10.767796242, 5),
        (-8.767796242, -10.767796242, -5),
    ]]
    fillet(fillet_7_edges, radius=FILLET_7_R)


solid = part.part
